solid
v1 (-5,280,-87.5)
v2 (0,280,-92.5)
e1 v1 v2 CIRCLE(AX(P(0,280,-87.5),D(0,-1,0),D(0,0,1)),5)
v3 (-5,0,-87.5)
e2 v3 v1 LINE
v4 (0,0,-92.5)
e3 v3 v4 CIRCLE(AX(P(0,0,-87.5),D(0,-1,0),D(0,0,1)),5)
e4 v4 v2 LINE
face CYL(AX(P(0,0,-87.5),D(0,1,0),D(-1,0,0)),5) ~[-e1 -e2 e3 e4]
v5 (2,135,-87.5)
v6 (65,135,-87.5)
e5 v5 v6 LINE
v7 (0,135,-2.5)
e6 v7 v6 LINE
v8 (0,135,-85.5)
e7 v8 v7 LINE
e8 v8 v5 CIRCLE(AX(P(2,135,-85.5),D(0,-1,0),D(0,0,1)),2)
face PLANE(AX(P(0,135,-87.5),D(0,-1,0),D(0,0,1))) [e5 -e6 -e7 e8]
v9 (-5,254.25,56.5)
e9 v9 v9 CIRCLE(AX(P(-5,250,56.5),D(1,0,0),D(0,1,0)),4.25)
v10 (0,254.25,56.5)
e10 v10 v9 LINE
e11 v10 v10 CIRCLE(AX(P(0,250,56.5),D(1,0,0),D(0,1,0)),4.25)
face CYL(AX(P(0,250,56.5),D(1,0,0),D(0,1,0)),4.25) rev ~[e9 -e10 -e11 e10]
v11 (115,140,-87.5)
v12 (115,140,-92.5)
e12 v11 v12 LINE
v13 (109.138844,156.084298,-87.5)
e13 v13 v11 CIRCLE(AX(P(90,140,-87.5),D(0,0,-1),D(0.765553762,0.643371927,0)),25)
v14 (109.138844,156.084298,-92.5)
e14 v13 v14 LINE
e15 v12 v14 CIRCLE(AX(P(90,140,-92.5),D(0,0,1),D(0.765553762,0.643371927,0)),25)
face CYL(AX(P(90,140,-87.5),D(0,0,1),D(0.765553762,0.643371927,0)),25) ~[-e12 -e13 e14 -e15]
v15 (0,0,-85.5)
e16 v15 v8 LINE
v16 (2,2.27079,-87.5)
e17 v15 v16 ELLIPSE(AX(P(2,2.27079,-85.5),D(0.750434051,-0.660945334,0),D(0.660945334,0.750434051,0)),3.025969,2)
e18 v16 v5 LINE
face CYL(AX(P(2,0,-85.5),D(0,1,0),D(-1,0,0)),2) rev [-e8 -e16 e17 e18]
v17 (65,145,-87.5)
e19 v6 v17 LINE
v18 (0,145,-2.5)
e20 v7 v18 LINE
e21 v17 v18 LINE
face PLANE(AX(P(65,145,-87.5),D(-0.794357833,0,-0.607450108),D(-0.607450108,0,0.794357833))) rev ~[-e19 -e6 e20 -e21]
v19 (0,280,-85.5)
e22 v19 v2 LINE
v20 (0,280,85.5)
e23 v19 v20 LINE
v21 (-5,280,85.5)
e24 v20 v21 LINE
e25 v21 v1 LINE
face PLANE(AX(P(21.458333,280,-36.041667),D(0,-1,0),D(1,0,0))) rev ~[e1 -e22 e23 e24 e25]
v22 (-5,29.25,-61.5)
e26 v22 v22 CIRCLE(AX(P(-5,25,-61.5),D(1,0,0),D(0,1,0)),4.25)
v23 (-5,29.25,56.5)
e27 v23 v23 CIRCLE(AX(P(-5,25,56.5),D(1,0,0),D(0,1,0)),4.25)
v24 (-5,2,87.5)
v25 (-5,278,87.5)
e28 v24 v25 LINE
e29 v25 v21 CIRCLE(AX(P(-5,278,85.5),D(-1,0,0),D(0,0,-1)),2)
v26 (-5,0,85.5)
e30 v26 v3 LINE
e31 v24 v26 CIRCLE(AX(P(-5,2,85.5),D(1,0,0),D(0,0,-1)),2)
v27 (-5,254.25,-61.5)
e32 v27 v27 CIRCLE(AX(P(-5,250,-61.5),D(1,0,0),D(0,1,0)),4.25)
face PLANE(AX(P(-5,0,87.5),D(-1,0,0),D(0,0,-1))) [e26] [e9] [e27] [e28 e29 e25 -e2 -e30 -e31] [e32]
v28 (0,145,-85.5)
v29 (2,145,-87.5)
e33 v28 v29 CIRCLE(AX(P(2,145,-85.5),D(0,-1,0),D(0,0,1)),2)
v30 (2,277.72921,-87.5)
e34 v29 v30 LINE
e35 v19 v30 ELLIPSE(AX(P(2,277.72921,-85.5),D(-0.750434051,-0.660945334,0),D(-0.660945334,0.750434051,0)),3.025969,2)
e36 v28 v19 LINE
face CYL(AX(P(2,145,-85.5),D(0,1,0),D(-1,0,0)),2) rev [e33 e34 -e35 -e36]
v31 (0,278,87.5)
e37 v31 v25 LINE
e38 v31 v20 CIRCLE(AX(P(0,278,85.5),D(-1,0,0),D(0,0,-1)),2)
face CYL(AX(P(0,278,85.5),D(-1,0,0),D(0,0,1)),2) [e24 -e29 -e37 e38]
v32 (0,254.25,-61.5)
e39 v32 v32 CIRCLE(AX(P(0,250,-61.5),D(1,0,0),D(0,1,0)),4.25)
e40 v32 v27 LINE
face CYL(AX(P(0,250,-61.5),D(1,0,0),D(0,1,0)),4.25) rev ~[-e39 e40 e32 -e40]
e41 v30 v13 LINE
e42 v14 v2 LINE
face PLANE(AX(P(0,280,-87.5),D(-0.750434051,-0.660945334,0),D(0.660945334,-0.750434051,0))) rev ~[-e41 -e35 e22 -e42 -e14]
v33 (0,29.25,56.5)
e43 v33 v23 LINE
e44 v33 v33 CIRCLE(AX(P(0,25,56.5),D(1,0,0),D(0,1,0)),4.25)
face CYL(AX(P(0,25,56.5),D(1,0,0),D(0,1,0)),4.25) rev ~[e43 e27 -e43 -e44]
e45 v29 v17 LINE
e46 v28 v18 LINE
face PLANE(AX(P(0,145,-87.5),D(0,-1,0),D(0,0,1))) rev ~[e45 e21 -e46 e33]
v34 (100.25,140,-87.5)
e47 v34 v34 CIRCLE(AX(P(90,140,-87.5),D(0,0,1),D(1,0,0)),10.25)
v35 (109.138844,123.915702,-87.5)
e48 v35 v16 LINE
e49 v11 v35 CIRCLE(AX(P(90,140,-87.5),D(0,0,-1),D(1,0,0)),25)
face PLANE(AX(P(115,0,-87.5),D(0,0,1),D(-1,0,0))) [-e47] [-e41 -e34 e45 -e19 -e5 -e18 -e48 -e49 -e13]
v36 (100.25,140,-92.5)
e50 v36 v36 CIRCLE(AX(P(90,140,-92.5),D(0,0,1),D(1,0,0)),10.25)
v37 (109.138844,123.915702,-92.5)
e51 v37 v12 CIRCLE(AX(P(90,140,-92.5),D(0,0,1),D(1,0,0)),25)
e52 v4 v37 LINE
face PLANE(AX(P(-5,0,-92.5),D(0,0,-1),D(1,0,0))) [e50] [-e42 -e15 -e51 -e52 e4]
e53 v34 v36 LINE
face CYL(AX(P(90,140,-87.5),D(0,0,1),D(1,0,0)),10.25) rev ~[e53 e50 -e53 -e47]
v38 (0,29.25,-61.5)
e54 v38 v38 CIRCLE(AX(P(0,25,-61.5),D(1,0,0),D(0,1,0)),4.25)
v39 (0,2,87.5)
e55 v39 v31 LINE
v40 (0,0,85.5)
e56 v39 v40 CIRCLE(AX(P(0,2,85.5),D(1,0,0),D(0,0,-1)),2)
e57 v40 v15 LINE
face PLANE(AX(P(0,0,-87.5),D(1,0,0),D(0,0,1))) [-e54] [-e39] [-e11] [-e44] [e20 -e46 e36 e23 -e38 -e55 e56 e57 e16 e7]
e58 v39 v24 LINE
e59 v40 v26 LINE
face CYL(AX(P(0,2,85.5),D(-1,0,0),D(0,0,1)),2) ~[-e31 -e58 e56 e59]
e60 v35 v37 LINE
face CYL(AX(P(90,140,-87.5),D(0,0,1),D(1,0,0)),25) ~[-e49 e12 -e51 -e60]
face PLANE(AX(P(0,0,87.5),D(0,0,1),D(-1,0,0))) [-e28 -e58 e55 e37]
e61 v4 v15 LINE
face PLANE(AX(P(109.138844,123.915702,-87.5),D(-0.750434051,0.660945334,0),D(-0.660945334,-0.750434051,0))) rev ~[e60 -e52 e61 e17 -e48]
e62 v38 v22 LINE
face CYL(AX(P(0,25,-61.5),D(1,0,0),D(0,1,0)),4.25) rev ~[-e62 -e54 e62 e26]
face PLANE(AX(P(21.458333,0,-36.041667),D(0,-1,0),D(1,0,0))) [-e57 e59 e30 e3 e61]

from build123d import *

# Parameters (mm, degrees)
F1_DEPTH  = 280
F2_R      = 2
F3_R      = 4.25
F4_DEPTH  = 5.001
F5_W      = 10
F5_H      = 85
F6_DEPTH  = 65
F8_DEPTH  = 145.001
F9_R      = 10.25
F10_DEPTH = 5.001
F11_R     = 5
F12_R     = 2


# Not quite as in the source:
# - a feature names something its author has since deleted; it is built from what else it names


with BuildPart() as f1:
    # F0 (on Front) → F1 (new body)
    with BuildSketch(Plane.XZ):
        Polygon((0, 87.5), (-5, 87.5), (-5, -92.5), (115, -92.5), (115, -87.5), (0, -87.5), align=None)
    extrude(amount=-F1_DEPTH)

    # F2
    f2_edges = [f1.edges().sort_by_distance(p)[0] for p in [
        (-2.5, 280, 87.5),
        (-2.5, 0, 87.5),
    ]]
    fillet(f2_edges, radius=F2_R)

    # F3 (on face) → F4 (cut, through all)
    with BuildSketch(Plane.YZ):
        with Locations((25, 56.5)):
            Circle(F3_R)
        with Locations((25, -61.5)):
            Circle(F3_R)
        with Locations((250, -61.5)):
            Circle(F3_R)
        with Locations((250, 56.5)):
            Circle(F3_R)
    extrude(amount=-F4_DEPTH, mode=Mode.SUBTRACT)

    # F5 (on face) → F6 (join)
    with BuildSketch(Plane.YZ):
        with Locations((140, -45)):
            Rectangle(F5_W, F5_H)
    extrude(amount=F6_DEPTH)

    # F7 (on face) → F8 (cut, through all)
    with BuildSketch(Plane(origin=(0, 145, 0), x_dir=(-1, 0, 0), z_dir=(0, 1, 0))):
        Polygon((-65, -87.5), (0, -2.5), (-65, -2.5), align=None)
    extrude(amount=-F8_DEPTH, mode=Mode.SUBTRACT)

    # F9 (on face) → F10 (cut, through all)
    with BuildSketch(Plane.XY.offset(-87.5)):
        with Locations((90, 140)):
            Circle(F9_R)
        with BuildLine():
            ThreePointArc((109.1388440622, 156.0842981806), (113.4890517215, 148.5594654753), (115, 140))
            Line((115, 140), (115, 280))
            Line((115, 280), (0, 280))
            Line((0, 280), (109.1388440622, 156.0842981806))
        make_face()
        with BuildLine():
            ThreePointArc((115, 140), (113.4890517215, 131.4405345247), (109.1388440622, 123.9157018194))
            Line((109.1388440622, 123.9157018194), (0, 0))
            Line((0, 0), (115, 0))
            Line((115, 0), (115, 140))
        make_face()
    extrude(amount=-F10_DEPTH, mode=Mode.SUBTRACT)

    # F11
    f11_edges = [f1.edges().sort_by_distance(p)[0] for p in [
        (-5, 140, -92.5),
    ]]
    fillet(f11_edges, radius=F11_R)

    # F12
    f12_edges = [f1.edges().sort_by_distance(p)[0] for p in [
        (0, 212.5, -87.5),
        (0, 67.5, -87.5),
    ]]
    fillet(f12_edges, radius=F12_R)


solid = f1.part
